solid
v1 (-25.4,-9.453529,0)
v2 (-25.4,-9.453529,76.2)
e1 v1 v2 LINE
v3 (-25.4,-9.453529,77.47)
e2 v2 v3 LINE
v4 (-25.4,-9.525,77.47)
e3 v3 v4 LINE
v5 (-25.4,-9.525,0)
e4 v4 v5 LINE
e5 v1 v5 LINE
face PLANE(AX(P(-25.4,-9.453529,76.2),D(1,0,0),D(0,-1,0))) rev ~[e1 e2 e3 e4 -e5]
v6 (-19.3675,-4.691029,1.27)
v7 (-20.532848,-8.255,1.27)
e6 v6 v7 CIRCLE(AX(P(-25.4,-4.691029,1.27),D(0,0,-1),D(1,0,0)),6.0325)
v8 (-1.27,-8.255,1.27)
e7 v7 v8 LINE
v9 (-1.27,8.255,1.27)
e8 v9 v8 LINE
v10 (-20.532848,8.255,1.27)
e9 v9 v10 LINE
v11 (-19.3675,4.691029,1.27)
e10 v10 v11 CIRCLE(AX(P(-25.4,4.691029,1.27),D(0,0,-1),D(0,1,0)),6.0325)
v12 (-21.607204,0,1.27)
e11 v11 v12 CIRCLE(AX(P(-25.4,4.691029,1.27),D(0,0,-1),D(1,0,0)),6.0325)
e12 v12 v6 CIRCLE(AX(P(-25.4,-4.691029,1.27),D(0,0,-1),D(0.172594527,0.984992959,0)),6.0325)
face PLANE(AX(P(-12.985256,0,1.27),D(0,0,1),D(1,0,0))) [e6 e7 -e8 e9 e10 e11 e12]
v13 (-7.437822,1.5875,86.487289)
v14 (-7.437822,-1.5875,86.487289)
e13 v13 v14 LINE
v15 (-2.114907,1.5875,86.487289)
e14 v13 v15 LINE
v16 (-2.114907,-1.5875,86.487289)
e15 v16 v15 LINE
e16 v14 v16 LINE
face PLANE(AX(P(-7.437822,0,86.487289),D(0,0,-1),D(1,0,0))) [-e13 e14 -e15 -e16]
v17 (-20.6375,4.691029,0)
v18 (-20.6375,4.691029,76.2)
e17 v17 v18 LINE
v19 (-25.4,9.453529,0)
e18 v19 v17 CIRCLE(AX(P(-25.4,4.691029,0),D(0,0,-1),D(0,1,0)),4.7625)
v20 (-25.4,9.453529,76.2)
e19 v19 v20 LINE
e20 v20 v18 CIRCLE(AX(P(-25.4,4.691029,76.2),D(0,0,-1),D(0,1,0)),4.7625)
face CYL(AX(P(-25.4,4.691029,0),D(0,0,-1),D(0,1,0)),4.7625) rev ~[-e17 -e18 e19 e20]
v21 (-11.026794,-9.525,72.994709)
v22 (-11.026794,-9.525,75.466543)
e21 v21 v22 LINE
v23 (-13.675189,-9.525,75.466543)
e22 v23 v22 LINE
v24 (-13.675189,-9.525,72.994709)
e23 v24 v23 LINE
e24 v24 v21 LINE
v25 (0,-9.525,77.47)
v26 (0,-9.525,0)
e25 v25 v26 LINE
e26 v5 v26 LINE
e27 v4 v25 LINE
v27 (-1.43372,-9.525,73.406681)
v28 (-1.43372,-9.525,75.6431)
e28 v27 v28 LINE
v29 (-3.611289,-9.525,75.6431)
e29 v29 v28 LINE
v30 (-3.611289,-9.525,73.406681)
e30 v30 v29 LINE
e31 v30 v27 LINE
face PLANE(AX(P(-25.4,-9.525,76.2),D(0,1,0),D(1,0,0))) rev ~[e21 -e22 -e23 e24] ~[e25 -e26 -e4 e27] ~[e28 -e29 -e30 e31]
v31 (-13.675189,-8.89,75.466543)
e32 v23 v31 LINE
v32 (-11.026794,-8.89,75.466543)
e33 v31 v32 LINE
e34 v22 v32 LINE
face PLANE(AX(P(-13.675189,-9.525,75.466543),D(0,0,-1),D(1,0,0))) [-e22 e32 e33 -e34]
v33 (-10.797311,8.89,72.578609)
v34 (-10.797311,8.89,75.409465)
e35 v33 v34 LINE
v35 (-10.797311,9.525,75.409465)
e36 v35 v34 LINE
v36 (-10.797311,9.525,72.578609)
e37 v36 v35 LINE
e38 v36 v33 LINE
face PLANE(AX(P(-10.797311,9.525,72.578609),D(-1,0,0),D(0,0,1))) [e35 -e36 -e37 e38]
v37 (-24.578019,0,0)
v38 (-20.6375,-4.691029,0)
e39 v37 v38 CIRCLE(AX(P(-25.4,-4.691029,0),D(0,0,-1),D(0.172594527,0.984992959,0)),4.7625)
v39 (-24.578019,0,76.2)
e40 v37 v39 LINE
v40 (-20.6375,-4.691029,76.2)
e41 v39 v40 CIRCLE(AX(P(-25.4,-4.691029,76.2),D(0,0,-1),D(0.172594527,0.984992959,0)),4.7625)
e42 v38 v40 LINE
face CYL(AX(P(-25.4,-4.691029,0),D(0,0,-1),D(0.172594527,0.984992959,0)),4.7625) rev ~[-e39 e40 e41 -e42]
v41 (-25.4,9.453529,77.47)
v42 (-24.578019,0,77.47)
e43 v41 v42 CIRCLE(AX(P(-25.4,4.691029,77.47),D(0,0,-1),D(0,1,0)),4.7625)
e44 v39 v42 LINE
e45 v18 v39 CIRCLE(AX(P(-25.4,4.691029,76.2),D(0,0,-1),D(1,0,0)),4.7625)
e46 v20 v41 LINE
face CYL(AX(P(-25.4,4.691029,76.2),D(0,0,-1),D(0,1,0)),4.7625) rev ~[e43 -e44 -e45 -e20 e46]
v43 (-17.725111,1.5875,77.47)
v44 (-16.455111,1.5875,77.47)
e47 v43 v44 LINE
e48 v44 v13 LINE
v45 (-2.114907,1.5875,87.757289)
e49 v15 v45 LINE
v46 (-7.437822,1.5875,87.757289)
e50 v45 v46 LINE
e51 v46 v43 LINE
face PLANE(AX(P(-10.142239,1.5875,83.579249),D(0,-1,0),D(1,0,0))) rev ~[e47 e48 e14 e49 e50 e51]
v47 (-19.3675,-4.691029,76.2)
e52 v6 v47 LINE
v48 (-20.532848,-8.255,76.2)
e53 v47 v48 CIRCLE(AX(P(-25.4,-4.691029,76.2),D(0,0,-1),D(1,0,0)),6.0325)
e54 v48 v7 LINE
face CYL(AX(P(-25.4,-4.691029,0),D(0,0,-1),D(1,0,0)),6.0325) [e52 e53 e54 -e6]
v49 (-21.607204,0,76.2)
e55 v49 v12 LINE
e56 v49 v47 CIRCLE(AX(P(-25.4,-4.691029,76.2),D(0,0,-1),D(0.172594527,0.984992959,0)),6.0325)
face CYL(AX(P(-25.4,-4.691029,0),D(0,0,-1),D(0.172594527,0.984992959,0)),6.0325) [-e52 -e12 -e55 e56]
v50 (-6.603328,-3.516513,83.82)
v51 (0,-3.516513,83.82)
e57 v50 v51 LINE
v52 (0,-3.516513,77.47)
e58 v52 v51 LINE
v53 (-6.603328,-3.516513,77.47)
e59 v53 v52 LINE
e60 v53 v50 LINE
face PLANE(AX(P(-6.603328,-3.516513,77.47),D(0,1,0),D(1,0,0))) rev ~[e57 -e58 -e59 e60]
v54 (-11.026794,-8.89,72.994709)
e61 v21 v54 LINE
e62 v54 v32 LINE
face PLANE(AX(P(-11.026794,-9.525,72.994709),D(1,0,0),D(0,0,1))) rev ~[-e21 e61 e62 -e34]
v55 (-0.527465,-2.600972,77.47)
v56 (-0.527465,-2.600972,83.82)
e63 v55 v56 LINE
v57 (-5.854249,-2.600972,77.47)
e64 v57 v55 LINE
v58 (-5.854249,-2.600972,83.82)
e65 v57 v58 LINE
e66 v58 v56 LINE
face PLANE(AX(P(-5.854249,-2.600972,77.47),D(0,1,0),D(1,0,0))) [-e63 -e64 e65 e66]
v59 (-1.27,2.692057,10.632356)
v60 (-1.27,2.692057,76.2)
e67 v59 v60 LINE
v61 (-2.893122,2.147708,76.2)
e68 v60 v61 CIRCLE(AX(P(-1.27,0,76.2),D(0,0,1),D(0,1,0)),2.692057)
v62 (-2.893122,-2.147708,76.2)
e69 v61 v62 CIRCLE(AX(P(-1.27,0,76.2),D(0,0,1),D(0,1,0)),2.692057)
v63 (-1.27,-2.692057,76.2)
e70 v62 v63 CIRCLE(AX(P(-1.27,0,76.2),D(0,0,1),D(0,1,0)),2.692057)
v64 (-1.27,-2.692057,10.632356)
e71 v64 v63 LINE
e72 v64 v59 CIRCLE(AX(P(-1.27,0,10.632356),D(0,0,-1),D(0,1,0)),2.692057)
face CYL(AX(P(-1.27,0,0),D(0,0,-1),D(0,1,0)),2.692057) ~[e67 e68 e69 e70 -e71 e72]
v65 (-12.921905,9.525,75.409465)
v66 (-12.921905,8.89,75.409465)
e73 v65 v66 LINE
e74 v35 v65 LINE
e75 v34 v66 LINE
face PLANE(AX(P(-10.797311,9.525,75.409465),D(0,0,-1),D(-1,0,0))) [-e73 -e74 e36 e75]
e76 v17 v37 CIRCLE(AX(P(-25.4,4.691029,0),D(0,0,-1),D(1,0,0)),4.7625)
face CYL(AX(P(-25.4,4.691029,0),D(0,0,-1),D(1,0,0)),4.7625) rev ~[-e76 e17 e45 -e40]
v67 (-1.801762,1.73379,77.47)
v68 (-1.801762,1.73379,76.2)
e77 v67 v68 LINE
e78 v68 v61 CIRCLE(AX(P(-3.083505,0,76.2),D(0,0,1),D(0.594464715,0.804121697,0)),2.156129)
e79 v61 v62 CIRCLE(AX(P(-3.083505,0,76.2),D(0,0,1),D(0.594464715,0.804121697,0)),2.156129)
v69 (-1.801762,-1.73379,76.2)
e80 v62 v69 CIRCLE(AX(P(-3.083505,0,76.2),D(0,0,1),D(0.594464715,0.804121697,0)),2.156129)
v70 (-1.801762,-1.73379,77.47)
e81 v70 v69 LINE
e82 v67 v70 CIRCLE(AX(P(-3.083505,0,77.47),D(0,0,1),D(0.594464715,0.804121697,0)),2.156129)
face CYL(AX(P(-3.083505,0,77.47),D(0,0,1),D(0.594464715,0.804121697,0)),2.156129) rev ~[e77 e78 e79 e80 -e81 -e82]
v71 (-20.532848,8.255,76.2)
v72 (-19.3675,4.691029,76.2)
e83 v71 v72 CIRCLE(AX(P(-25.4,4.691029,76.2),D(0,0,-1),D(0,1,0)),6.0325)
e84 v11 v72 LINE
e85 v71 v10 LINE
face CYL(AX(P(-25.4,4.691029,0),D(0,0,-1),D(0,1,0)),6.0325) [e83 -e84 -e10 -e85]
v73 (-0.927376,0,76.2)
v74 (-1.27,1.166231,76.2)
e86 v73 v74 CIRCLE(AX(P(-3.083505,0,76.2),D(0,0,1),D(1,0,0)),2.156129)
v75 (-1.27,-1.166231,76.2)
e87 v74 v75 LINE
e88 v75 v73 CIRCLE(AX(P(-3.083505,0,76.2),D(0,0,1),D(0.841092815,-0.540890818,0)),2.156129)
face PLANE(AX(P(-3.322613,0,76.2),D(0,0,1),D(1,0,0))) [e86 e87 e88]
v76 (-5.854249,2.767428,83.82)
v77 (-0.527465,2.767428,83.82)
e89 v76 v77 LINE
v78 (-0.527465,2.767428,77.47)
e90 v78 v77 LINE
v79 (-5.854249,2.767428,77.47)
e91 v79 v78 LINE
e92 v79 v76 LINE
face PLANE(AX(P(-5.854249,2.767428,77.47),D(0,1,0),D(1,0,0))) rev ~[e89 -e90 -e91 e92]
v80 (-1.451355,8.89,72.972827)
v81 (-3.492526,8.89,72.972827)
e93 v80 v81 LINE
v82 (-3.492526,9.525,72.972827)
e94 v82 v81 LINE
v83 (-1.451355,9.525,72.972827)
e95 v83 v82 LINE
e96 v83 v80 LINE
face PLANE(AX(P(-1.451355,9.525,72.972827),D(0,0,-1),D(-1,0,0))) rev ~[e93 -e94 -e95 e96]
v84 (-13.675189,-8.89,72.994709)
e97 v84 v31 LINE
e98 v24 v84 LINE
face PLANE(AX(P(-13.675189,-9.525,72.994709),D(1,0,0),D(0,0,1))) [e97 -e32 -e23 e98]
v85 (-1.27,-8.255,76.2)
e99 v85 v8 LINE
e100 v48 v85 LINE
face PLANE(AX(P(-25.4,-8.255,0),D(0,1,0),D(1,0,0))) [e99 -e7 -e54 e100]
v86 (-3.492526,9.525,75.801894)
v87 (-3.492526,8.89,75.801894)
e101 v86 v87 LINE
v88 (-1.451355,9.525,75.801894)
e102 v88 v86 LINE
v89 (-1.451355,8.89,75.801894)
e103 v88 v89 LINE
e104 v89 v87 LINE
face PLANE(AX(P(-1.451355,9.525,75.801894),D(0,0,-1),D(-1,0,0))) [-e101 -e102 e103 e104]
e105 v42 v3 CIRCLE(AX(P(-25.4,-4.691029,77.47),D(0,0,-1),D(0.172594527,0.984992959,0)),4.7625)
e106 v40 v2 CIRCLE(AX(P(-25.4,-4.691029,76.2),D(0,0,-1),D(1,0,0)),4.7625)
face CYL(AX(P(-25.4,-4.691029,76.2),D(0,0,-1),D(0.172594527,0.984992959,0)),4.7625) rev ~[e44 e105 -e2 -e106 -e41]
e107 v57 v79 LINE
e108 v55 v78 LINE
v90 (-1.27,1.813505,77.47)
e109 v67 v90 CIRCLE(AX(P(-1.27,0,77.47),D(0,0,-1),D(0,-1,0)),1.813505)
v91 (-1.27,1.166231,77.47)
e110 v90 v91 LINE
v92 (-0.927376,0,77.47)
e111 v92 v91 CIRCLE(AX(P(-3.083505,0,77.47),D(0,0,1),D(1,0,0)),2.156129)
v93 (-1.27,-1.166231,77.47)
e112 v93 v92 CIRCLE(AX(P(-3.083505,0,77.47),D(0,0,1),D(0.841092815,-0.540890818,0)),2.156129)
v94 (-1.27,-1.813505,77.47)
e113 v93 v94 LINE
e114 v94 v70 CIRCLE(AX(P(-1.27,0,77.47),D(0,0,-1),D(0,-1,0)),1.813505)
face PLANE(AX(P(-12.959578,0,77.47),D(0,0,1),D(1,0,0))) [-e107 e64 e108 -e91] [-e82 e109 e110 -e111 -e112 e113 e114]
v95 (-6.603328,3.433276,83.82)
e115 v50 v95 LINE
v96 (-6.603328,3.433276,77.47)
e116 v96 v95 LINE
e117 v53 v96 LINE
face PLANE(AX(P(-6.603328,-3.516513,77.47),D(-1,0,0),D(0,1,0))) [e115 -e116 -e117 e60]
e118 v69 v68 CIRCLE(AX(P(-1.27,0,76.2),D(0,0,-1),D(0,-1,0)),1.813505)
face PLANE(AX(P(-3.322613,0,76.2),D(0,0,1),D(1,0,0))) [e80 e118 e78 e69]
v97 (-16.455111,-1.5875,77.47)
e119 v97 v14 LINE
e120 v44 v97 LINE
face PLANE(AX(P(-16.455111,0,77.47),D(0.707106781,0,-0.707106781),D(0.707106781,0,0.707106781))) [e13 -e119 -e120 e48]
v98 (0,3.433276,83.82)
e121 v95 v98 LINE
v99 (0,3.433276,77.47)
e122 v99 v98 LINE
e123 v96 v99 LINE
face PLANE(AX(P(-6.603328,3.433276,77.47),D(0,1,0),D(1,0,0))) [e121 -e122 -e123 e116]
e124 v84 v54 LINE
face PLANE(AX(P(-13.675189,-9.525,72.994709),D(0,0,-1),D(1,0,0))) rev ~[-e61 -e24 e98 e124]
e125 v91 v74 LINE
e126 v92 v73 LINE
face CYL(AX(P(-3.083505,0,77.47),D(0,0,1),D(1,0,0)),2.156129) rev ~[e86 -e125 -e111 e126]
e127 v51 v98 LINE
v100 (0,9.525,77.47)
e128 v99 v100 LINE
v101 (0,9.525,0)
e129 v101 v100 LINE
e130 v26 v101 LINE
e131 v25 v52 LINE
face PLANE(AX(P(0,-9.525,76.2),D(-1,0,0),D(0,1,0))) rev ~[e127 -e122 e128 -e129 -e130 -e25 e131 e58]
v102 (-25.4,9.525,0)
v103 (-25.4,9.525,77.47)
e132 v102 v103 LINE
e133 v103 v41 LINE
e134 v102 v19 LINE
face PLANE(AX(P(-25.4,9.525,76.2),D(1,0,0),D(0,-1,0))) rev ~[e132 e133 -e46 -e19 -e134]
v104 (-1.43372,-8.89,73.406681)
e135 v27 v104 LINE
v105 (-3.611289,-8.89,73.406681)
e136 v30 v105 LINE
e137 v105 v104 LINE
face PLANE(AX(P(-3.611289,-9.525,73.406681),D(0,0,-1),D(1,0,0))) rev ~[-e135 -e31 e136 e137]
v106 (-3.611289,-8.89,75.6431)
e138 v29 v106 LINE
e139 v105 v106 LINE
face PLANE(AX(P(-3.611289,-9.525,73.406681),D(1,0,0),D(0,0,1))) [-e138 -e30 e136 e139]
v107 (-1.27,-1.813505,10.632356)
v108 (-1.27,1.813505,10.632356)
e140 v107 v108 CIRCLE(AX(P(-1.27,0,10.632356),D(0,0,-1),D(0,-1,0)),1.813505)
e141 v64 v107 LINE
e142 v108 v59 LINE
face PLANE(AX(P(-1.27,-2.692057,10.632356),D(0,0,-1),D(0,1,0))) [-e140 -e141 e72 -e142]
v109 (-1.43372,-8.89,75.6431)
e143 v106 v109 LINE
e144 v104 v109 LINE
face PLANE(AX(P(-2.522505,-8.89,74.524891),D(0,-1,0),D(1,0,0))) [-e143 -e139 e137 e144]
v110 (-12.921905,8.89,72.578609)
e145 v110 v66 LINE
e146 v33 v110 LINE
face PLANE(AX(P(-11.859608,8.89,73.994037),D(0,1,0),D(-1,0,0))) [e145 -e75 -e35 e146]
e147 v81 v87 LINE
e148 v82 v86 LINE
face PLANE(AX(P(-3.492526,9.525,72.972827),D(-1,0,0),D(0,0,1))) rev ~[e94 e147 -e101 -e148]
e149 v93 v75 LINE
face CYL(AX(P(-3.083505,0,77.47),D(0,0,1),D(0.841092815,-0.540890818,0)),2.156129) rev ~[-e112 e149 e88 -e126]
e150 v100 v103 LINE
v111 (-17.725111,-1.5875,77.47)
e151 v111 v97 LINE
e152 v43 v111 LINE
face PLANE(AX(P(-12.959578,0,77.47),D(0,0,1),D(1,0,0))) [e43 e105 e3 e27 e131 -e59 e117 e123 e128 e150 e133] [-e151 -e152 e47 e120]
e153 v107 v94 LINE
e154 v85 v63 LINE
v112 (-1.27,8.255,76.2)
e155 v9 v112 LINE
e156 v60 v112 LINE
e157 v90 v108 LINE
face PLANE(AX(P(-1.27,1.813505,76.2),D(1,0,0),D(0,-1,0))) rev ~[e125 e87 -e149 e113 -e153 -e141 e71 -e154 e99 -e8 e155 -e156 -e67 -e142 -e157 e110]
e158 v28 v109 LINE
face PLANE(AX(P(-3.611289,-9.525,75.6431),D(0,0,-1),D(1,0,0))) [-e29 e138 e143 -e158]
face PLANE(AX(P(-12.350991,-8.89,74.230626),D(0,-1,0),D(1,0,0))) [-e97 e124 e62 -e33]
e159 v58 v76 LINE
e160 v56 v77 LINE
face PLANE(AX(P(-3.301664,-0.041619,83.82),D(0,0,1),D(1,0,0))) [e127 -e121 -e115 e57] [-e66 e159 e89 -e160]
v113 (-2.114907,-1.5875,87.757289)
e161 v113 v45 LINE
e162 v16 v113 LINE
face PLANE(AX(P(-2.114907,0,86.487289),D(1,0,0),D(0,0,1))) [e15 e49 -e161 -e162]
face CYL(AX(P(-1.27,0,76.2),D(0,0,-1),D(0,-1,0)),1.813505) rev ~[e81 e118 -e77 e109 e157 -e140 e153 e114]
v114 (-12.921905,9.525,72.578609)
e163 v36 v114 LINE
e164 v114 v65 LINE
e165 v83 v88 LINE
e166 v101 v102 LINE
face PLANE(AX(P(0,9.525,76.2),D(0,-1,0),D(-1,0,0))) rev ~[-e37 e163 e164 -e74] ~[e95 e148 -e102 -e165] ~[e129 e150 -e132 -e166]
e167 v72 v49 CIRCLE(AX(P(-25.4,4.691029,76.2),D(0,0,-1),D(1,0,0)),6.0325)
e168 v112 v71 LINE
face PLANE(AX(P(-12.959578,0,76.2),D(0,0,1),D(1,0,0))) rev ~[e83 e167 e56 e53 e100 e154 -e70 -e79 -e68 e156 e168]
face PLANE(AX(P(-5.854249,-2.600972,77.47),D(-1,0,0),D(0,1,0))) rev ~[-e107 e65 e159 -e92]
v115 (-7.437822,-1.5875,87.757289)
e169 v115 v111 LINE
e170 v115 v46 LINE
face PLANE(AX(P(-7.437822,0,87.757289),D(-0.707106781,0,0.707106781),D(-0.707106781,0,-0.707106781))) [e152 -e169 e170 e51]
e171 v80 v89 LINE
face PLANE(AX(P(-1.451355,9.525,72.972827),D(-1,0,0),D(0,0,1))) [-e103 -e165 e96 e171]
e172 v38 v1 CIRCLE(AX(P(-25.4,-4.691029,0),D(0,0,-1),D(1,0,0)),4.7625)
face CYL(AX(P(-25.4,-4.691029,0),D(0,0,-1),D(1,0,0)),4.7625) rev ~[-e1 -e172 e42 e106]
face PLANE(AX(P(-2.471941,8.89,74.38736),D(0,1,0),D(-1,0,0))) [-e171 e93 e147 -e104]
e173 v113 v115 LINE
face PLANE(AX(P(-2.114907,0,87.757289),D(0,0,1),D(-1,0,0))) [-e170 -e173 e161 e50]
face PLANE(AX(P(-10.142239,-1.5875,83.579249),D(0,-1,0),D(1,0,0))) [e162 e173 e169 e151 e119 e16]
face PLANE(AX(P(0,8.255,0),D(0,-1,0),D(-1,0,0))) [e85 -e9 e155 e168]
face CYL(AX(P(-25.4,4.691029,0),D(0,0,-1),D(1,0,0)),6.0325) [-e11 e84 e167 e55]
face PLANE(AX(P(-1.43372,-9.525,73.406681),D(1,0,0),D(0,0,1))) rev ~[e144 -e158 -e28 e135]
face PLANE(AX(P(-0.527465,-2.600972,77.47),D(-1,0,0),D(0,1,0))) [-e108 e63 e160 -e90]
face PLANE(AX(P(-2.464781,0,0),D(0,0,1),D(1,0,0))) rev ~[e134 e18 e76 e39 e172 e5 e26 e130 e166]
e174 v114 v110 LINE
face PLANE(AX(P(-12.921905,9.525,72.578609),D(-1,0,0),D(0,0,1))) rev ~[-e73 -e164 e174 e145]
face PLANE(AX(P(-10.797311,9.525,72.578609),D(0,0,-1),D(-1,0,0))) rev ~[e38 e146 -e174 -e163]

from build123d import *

# Parameters (mm, degrees)
F1_DEPTH  = 76.2
F2_T      = -1.27
F4_DEPTH  = 76.2
F6_DEPTH  = 12.7
F8_DEPTH  = 1.27
F10_DEPTH = 1.27
F12_DEPTH = 1.5875
F13_W     = 6.6033280455
F13_H     = 6.9497893564
F13_W_2   = 5.3267844487
F13_H_2   = 5.3683998995
F14_DEPTH = 6.35
F15_W     = 2.0411710721
F15_H     = 2.829067409
F15_W_2   = 2.1245945245
F15_H_2   = 2.8308555484
F16_DEPTH = 0.635
F17_W     = 2.6483945549
F17_H     = 2.4718344212
F17_W_2   = 2.1775695495
F17_H_2   = 2.236418426
F18_DEPTH = 0.635


# Not quite as in the source:
# - a feature names something its author has since deleted; it is built from what else it names


with BuildPart() as f1:
    # F0 (on Top) → F1 (new body)
    with BuildSketch(Plane.XY):
        with BuildLine():
            Line((0, -9.525), (0, 9.525))
            Line((0, 9.525), (-25.4, 9.525))
            Line((-25.4, 9.525), (-25.4, 9.4535289675))
            ThreePointArc((-25.4, 9.4535289675), (-22.0324039546, 8.0586250129), (-20.6375, 4.6910289675))
            ThreePointArc((-20.6375, 4.6910289675), (-21.7533513451, 1.6278019374), (-24.5780185671, 0))
            ThreePointArc((-24.5780185671, 0), (-21.7533513451, -1.6278019374), (-20.6375, -4.6910289675))
            ThreePointArc((-20.6375, -4.6910289675), (-22.0324039546, -8.0586250129), (-25.4, -9.4535289675))
            Line((-25.4, -9.4535289675), (-25.4, -9.525))
            Line((-25.4, -9.525), (0, -9.525))
        make_face()
    extrude(amount=F1_DEPTH)

    # F2
    f2_openings = [f1.faces().sort_by_distance(p)[0] for p in [
        (-10.85856, 0, 76.2),
    ]]
    offset(amount=F2_T, openings=f2_openings)

    # F3 (on Top) → F4 (join)
    with BuildSketch(Plane.XY):
        with BuildLine():
            Line((-1.27, 1.8135049587), (-1.27, 2.6920572227))
            ThreePointArc((-1.27, 2.6920572227), (-3.9620572227, 0), (-1.27, -2.6920572227))
            Line((-1.27, -2.6920572227), (-1.27, -1.8135049587))
            ThreePointArc((-1.27, -1.8135049587), (-3.0835049587, 0), (-1.27, 1.8135049587))
        make_face()
    extrude(amount=F4_DEPTH)

    # F5 (on face) → F6 (cut)
    with BuildSketch(Plane(origin=(-1.27, 0, 0), x_dir=(0, -1, 0), z_dir=(-1, 0, 0))):
        Polygon((-2.6920572227, 1.27), (2.6920572227, 1.27), (2.6920572227, 10.6323556975), (-3.4403376048, 10.6323556975), (-3.4403376048, 1.27), align=None)
    extrude(amount=F6_DEPTH, mode=Mode.SUBTRACT)

    # F7 (on face) → F8 (join)
    with BuildSketch(Plane.XY.offset(76.2)):
        with BuildLine():
            Line((0, -9.525), (0, 9.525))
            Line((0, 9.525), (-25.4, 9.525))
            Line((-25.4, 9.525), (-25.4, 9.4535289675))
            ThreePointArc((-25.4, 9.4535289675), (-20.6554014022, 5.1035703547), (-24.5780185671, 0))
            ThreePointArc((-24.5780185671, 0), (-20.6554014022, -5.1035703547), (-25.4, -9.4535289675))
            Line((-25.4, -9.4535289675), (-25.4, -9.525))
            Line((-25.4, -9.525), (0, -9.525))
        make_face()
        with BuildLine():
            ThreePointArc((-1.27, 2.6920572227), (-3.9620572227, 0), (-1.27, -2.6920572227))
            Line((-1.27, -2.6920572227), (-1.27, -8.255))
            Line((-1.27, -8.255), (-20.5328481912, -8.255))
            ThreePointArc((-20.5328481912, -8.255), (-19.4179492319, -3.9124887578), (-21.6072037392, 0))
            ThreePointArc((-21.6072037392, 0), (-19.4179492319, 3.9124887578), (-20.5328481912, 8.255))
            Line((-20.5328481912, 8.255), (-1.27, 8.255))
            Line((-1.27, 8.255), (-1.27, 2.6920572227))
        make_face(mode=Mode.SUBTRACT)
        with BuildLine():
            ThreePointArc((-1.27, -1.8135049587), (-3.0835049587, 0), (-1.27, 1.8135049587))
            Line((-1.27, 1.8135049587), (-1.27, -1.8135049587))
        make_face(mode=Mode.SUBTRACT)
        with BuildLine():
            Line((-1.27, -8.255), (-1.27, -2.6920572227))
            ThreePointArc((-1.27, -2.6920572227), (-3.9620572227, 0), (-1.27, 2.6920572227))
            Line((-1.27, 2.6920572227), (-1.27, 8.255))
            Line((-1.27, 8.255), (-20.5328481912, 8.255))
            ThreePointArc((-20.5328481912, 8.255), (-19.4179492319, 3.9124887578), (-21.6072037392, 0))
            ThreePointArc((-21.6072037392, 0), (-19.4179492319, -3.9124887578), (-20.5328481912, -8.255))
            Line((-20.5328481912, -8.255), (-1.27, -8.255))
        make_face()
    extrude(amount=F8_DEPTH)

    # F9 (on face) → F10 (cut)
    with BuildSketch(Plane.XY.offset(77.47)):
        with BuildLine():
            ThreePointArc((-1.8017621012, -1.7337904437), (-3.0835049587, 0), (-1.8017621012, 1.7337904437))
            ThreePointArc((-1.8017621012, 1.7337904437), (-5.239634374, 0), (-1.8017621012, -1.7337904437))
        make_face()
        with BuildLine():
            ThreePointArc((-1.27, -1.1662306034), (-1.0148042261, -0.6077592736), (-0.9273755434, 0))
            ThreePointArc((-0.9273755434, 0), (-1.0148042261, 0.6077592736), (-1.27, 1.1662306034))
            Line((-1.27, 1.1662306034), (-1.27, -1.1662306034))
        make_face()
        with BuildLine():
            Line((-1.27, -1.1662306034), (-1.27, 1.1662306034))
            ThreePointArc((-1.27, 1.1662306034), (-1.5100785054, 1.4741856232), (-1.8017621012, 1.7337904437))
            ThreePointArc((-1.8017621012, 1.7337904437), (-3.0835049587, 0), (-1.8017621012, -1.7337904437))
            ThreePointArc((-1.8017621012, -1.7337904437), (-1.5100785054, -1.4741856232), (-1.27, -1.1662306034))
        make_face()
    extrude(amount=-F10_DEPTH, mode=Mode.SUBTRACT)

    # F11 (on Front) → F12 (join, symmetric)
    with BuildSketch(Plane.XZ):
        Polygon((-7.4378219433, 87.7572894096), (-17.725111353, 77.47), (-16.455111353, 77.47), (-7.4378219433, 86.4872894096), (-2.1149073727, 86.4872894096), (-2.1149073727, 87.7572894096), align=None)
    extrude(amount=F12_DEPTH, both=True)

    # F13 (on face) → F14 (join)
    with BuildSketch(Plane.XY.offset(77.47)):
        with Locations((-3.3016640227, -0.0416187104)):
            Rectangle(F13_W, F13_H)
        with Locations((-3.1908567762, 0.0832278747)):
            Rectangle(F13_W_2, F13_H_2, mode=Mode.SUBTRACT)
    extrude(amount=F14_DEPTH)

    # F15 (on face) → F16 (cut)
    with BuildSketch(Plane(origin=(0, 9.525, 0), x_dir=(-1, 0, 0), z_dir=(0, 1, 0))):
        with Locations((2.4719407083, 74.3873603642)):
            Rectangle(F15_W, F15_H)
        with Locations((11.8596078828, 73.9940367639)):
            Rectangle(F15_W_2, F15_H_2)
    extrude(amount=-F16_DEPTH, mode=Mode.SUBTRACT)

    # F17 (on face) → F18 (cut)
    with BuildSketch(Plane.XZ.offset(9.525)):
        with Locations((-12.3509913683, 74.2306262255)):
            Rectangle(F17_W, F17_H)
        with Locations((-2.5225046556, 74.5248906314)):
            Rectangle(F17_W_2, F17_H_2)
    extrude(amount=-F18_DEPTH, mode=Mode.SUBTRACT)


solid = f1.part
